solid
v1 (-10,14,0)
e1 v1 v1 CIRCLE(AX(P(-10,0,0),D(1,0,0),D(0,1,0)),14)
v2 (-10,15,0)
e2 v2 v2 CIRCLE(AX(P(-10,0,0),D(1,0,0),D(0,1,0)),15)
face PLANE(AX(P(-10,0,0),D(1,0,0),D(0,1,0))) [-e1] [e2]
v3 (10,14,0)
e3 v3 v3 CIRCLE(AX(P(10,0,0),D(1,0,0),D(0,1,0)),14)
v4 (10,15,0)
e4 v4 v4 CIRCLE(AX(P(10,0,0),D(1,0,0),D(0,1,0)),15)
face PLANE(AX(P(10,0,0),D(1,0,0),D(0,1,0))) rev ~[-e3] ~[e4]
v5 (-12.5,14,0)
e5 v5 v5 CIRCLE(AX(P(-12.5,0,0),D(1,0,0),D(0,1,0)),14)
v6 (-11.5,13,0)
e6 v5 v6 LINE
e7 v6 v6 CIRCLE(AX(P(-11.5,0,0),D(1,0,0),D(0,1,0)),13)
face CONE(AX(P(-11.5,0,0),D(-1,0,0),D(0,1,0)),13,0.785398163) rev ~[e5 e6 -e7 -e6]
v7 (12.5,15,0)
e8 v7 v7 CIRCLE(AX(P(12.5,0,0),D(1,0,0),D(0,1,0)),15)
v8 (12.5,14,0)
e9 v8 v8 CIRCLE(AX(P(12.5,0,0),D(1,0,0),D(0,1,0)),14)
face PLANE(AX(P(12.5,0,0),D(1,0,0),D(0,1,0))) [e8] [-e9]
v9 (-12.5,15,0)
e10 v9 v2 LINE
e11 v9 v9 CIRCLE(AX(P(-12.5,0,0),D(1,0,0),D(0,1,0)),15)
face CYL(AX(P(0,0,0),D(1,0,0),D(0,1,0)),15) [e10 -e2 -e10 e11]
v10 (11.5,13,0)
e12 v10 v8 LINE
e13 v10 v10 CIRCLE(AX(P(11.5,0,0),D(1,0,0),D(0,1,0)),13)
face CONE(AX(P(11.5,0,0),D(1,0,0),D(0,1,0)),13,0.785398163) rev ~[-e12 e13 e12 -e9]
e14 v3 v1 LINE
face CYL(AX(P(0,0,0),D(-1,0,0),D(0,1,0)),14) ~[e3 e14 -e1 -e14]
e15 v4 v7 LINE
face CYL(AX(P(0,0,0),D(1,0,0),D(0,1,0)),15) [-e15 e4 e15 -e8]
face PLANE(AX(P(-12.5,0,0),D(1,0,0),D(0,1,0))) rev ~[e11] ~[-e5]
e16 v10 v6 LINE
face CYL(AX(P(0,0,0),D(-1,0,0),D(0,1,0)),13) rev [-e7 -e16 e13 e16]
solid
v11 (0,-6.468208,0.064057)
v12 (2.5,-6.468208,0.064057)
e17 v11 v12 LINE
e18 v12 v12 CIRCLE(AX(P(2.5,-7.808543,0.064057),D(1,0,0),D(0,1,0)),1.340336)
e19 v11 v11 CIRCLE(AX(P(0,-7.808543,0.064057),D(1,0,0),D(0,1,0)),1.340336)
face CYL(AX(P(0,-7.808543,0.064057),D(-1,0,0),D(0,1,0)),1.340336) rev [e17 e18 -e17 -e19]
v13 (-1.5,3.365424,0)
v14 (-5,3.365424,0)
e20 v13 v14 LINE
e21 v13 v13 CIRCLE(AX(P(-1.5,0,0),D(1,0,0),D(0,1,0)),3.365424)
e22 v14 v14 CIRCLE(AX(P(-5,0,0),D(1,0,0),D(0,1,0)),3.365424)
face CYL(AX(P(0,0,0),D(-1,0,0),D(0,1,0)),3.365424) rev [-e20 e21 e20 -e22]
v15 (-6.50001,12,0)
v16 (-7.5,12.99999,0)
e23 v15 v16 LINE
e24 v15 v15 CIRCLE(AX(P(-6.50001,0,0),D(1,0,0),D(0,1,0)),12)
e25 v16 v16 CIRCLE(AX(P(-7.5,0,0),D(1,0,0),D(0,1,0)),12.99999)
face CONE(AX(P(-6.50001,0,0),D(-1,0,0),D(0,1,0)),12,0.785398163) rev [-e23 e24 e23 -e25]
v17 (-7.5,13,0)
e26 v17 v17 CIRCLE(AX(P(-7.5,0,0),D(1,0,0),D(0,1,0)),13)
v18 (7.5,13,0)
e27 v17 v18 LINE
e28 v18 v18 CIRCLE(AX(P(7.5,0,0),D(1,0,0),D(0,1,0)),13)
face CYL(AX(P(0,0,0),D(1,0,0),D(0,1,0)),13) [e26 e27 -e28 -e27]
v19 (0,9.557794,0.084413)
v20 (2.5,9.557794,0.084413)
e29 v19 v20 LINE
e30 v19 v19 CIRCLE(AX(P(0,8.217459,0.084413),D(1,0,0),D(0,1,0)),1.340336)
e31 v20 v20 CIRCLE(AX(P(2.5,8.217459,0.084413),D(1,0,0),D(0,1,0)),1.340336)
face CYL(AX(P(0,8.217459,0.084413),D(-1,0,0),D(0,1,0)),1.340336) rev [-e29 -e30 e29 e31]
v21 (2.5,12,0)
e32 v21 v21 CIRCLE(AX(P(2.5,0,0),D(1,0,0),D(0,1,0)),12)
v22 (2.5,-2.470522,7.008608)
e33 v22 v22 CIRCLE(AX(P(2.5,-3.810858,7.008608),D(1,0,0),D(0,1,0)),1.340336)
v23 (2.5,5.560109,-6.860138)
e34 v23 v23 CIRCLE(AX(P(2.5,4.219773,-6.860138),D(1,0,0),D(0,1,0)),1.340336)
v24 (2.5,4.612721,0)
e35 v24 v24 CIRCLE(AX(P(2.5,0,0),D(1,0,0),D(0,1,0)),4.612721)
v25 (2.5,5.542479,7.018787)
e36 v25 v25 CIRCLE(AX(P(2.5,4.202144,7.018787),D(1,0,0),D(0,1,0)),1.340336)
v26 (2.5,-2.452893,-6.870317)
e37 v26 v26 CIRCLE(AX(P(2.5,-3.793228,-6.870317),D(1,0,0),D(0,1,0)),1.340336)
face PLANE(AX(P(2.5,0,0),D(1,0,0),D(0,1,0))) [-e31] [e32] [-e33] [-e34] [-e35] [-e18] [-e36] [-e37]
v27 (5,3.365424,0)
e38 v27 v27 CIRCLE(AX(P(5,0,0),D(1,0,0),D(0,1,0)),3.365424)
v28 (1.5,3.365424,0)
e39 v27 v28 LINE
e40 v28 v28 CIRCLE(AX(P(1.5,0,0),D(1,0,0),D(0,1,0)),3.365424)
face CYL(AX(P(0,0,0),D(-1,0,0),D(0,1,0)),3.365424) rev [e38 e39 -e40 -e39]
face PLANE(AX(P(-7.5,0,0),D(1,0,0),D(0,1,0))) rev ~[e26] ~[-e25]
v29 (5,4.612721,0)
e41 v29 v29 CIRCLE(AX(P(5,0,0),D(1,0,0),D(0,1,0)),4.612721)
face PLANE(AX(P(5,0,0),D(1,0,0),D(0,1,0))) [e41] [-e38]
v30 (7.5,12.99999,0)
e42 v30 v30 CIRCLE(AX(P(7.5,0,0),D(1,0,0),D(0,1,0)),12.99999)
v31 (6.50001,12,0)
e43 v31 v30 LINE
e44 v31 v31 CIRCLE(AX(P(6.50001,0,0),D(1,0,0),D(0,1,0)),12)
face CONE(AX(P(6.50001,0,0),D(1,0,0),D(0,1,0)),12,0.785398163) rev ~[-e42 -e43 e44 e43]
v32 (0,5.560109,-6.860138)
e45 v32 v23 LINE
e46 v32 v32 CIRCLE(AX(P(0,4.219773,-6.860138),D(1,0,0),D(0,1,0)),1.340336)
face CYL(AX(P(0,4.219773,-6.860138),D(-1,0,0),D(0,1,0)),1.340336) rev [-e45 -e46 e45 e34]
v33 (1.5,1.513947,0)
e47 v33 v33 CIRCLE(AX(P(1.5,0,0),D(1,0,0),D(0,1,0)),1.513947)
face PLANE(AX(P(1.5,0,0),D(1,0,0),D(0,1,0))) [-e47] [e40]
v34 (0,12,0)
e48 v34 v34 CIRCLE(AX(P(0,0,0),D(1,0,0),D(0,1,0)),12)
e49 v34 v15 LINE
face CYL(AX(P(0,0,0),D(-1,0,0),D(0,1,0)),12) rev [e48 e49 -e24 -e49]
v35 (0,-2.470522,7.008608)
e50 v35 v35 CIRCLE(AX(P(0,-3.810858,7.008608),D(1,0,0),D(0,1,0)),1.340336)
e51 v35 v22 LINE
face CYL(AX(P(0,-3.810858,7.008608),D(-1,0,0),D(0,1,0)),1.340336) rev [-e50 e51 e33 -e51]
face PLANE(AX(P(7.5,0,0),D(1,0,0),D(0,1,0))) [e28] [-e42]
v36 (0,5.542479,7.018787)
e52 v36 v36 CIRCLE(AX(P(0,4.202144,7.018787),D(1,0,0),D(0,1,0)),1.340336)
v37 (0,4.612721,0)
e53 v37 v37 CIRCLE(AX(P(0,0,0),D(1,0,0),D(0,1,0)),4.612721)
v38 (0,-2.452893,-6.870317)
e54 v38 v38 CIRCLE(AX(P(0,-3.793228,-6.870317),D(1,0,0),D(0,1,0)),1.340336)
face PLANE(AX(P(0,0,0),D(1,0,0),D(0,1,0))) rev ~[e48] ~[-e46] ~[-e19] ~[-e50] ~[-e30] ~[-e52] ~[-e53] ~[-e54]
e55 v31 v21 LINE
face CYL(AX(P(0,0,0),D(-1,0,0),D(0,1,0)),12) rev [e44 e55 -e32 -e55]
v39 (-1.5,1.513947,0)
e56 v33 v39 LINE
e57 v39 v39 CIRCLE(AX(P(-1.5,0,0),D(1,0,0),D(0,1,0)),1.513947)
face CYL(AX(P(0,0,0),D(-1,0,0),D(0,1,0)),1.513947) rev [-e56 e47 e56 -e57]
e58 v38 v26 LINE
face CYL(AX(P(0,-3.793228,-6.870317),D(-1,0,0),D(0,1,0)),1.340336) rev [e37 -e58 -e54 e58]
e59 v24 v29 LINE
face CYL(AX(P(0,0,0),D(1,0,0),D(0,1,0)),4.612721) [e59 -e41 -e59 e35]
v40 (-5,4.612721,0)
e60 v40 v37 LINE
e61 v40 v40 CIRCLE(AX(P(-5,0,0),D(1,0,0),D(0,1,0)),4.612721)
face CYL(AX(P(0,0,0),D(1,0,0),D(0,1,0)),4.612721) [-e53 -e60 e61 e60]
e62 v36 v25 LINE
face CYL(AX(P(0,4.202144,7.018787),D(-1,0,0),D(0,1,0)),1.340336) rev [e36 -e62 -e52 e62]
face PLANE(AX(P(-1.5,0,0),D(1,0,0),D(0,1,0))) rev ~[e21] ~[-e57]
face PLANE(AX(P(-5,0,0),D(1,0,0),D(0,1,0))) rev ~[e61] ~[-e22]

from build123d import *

# Parameters (mm, degrees)
F0_R     = 15
F0_R_2   = 14
F0_R_3   = 13
F1_DEPTH = 12.5
F0_R_4   = 12
F2_DEPTH = 7.5
F0_R_5   = 1.340335668
F0_R_6   = 4.6127208632
F3_DEPTH = 2.5
F0_R_7   = 3.3654242234
F4_DEPTH = 5
F0_R_8   = 1.513947391
F5_DEPTH = 1.5
F6_DEPTH = 10
F7_SIZE  = 0.99999
F8_SIZE  = 1


# Not quite as in the source:
# - a fillet or chamfer is up to 0.001 mm smaller than in the source, because OpenCascade refuses the exact size


with BuildPart() as f1:
    # F0 (on Right) → F1 (new body, symmetric)
    with BuildSketch(Plane.YZ):
        Circle(F0_R)
        Circle(F0_R_2, mode=Mode.SUBTRACT)
        Circle(F0_R_2)
        Circle(F0_R_3, mode=Mode.SUBTRACT)
    extrude(amount=F1_DEPTH, both=True)

    # F0 (on Right) → F6 (cut, symmetric)
    with BuildSketch(Plane.YZ):
        Circle(F0_R)
        Circle(F0_R_2, mode=Mode.SUBTRACT)
    extrude(amount=F6_DEPTH, both=True, mode=Mode.SUBTRACT)

    # F8
    f8_edges = [f1.edges().sort_by_distance(p)[0] for p in [
        (-12.5, -13, 0),
        (12.5, -13, 0),
    ]]
    chamfer(f8_edges, length=F8_SIZE)


with BuildPart() as f2:
    # F0 (on Right) → F2 (new body, symmetric)
    with BuildSketch(Plane.YZ):
        Circle(F0_R_3)
        Circle(F0_R_4, mode=Mode.SUBTRACT)
    extrude(amount=F2_DEPTH, both=True)

    # F0 (on Right) → F3 (join)
    with BuildSketch(Plane.YZ):
        Circle(F0_R_4)
        with Locations((-3.7932281848, -6.8703168072)):
            Circle(F0_R_5, mode=Mode.SUBTRACT)
        with Locations((4.2197729637, -6.8601384378)):
            Circle(F0_R_5, mode=Mode.SUBTRACT)
        with Locations((-7.8085434855, 0.0640565633)):
            Circle(F0_R_5, mode=Mode.SUBTRACT)
        with Locations((-3.8108576376, 7.0086083031)):
            Circle(F0_R_5, mode=Mode.SUBTRACT)
        Circle(F0_R_6, mode=Mode.SUBTRACT)
        with Locations((4.2021435108, 7.0187866725)):
            Circle(F0_R_5, mode=Mode.SUBTRACT)
        with Locations((8.2174588115, 0.084413302)):
            Circle(F0_R_5, mode=Mode.SUBTRACT)
    extrude(amount=F3_DEPTH)

    # F0 (on Right) → F4 (join, symmetric)
    with BuildSketch(Plane.YZ):
        Circle(F0_R_6)
        Circle(F0_R_7, mode=Mode.SUBTRACT)
    extrude(amount=F4_DEPTH, both=True)

    # F0 (on Right) → F5 (join, symmetric)
    with BuildSketch(Plane.YZ):
        Circle(F0_R_7)
        Circle(F0_R_8, mode=Mode.SUBTRACT)
    extrude(amount=F5_DEPTH, both=True)

    # F7 (size 1 in the source; OpenCascade refuses exactly that, so slightly less here)
    f7_edges = [f2.edges().sort_by_distance(p)[0] for p in [
        (7.5, -12, 0),
        (-7.5, -12, 0),
    ]]
    chamfer(f7_edges, length=F7_SIZE)


solid = Compound([f1.part, f2.part])
